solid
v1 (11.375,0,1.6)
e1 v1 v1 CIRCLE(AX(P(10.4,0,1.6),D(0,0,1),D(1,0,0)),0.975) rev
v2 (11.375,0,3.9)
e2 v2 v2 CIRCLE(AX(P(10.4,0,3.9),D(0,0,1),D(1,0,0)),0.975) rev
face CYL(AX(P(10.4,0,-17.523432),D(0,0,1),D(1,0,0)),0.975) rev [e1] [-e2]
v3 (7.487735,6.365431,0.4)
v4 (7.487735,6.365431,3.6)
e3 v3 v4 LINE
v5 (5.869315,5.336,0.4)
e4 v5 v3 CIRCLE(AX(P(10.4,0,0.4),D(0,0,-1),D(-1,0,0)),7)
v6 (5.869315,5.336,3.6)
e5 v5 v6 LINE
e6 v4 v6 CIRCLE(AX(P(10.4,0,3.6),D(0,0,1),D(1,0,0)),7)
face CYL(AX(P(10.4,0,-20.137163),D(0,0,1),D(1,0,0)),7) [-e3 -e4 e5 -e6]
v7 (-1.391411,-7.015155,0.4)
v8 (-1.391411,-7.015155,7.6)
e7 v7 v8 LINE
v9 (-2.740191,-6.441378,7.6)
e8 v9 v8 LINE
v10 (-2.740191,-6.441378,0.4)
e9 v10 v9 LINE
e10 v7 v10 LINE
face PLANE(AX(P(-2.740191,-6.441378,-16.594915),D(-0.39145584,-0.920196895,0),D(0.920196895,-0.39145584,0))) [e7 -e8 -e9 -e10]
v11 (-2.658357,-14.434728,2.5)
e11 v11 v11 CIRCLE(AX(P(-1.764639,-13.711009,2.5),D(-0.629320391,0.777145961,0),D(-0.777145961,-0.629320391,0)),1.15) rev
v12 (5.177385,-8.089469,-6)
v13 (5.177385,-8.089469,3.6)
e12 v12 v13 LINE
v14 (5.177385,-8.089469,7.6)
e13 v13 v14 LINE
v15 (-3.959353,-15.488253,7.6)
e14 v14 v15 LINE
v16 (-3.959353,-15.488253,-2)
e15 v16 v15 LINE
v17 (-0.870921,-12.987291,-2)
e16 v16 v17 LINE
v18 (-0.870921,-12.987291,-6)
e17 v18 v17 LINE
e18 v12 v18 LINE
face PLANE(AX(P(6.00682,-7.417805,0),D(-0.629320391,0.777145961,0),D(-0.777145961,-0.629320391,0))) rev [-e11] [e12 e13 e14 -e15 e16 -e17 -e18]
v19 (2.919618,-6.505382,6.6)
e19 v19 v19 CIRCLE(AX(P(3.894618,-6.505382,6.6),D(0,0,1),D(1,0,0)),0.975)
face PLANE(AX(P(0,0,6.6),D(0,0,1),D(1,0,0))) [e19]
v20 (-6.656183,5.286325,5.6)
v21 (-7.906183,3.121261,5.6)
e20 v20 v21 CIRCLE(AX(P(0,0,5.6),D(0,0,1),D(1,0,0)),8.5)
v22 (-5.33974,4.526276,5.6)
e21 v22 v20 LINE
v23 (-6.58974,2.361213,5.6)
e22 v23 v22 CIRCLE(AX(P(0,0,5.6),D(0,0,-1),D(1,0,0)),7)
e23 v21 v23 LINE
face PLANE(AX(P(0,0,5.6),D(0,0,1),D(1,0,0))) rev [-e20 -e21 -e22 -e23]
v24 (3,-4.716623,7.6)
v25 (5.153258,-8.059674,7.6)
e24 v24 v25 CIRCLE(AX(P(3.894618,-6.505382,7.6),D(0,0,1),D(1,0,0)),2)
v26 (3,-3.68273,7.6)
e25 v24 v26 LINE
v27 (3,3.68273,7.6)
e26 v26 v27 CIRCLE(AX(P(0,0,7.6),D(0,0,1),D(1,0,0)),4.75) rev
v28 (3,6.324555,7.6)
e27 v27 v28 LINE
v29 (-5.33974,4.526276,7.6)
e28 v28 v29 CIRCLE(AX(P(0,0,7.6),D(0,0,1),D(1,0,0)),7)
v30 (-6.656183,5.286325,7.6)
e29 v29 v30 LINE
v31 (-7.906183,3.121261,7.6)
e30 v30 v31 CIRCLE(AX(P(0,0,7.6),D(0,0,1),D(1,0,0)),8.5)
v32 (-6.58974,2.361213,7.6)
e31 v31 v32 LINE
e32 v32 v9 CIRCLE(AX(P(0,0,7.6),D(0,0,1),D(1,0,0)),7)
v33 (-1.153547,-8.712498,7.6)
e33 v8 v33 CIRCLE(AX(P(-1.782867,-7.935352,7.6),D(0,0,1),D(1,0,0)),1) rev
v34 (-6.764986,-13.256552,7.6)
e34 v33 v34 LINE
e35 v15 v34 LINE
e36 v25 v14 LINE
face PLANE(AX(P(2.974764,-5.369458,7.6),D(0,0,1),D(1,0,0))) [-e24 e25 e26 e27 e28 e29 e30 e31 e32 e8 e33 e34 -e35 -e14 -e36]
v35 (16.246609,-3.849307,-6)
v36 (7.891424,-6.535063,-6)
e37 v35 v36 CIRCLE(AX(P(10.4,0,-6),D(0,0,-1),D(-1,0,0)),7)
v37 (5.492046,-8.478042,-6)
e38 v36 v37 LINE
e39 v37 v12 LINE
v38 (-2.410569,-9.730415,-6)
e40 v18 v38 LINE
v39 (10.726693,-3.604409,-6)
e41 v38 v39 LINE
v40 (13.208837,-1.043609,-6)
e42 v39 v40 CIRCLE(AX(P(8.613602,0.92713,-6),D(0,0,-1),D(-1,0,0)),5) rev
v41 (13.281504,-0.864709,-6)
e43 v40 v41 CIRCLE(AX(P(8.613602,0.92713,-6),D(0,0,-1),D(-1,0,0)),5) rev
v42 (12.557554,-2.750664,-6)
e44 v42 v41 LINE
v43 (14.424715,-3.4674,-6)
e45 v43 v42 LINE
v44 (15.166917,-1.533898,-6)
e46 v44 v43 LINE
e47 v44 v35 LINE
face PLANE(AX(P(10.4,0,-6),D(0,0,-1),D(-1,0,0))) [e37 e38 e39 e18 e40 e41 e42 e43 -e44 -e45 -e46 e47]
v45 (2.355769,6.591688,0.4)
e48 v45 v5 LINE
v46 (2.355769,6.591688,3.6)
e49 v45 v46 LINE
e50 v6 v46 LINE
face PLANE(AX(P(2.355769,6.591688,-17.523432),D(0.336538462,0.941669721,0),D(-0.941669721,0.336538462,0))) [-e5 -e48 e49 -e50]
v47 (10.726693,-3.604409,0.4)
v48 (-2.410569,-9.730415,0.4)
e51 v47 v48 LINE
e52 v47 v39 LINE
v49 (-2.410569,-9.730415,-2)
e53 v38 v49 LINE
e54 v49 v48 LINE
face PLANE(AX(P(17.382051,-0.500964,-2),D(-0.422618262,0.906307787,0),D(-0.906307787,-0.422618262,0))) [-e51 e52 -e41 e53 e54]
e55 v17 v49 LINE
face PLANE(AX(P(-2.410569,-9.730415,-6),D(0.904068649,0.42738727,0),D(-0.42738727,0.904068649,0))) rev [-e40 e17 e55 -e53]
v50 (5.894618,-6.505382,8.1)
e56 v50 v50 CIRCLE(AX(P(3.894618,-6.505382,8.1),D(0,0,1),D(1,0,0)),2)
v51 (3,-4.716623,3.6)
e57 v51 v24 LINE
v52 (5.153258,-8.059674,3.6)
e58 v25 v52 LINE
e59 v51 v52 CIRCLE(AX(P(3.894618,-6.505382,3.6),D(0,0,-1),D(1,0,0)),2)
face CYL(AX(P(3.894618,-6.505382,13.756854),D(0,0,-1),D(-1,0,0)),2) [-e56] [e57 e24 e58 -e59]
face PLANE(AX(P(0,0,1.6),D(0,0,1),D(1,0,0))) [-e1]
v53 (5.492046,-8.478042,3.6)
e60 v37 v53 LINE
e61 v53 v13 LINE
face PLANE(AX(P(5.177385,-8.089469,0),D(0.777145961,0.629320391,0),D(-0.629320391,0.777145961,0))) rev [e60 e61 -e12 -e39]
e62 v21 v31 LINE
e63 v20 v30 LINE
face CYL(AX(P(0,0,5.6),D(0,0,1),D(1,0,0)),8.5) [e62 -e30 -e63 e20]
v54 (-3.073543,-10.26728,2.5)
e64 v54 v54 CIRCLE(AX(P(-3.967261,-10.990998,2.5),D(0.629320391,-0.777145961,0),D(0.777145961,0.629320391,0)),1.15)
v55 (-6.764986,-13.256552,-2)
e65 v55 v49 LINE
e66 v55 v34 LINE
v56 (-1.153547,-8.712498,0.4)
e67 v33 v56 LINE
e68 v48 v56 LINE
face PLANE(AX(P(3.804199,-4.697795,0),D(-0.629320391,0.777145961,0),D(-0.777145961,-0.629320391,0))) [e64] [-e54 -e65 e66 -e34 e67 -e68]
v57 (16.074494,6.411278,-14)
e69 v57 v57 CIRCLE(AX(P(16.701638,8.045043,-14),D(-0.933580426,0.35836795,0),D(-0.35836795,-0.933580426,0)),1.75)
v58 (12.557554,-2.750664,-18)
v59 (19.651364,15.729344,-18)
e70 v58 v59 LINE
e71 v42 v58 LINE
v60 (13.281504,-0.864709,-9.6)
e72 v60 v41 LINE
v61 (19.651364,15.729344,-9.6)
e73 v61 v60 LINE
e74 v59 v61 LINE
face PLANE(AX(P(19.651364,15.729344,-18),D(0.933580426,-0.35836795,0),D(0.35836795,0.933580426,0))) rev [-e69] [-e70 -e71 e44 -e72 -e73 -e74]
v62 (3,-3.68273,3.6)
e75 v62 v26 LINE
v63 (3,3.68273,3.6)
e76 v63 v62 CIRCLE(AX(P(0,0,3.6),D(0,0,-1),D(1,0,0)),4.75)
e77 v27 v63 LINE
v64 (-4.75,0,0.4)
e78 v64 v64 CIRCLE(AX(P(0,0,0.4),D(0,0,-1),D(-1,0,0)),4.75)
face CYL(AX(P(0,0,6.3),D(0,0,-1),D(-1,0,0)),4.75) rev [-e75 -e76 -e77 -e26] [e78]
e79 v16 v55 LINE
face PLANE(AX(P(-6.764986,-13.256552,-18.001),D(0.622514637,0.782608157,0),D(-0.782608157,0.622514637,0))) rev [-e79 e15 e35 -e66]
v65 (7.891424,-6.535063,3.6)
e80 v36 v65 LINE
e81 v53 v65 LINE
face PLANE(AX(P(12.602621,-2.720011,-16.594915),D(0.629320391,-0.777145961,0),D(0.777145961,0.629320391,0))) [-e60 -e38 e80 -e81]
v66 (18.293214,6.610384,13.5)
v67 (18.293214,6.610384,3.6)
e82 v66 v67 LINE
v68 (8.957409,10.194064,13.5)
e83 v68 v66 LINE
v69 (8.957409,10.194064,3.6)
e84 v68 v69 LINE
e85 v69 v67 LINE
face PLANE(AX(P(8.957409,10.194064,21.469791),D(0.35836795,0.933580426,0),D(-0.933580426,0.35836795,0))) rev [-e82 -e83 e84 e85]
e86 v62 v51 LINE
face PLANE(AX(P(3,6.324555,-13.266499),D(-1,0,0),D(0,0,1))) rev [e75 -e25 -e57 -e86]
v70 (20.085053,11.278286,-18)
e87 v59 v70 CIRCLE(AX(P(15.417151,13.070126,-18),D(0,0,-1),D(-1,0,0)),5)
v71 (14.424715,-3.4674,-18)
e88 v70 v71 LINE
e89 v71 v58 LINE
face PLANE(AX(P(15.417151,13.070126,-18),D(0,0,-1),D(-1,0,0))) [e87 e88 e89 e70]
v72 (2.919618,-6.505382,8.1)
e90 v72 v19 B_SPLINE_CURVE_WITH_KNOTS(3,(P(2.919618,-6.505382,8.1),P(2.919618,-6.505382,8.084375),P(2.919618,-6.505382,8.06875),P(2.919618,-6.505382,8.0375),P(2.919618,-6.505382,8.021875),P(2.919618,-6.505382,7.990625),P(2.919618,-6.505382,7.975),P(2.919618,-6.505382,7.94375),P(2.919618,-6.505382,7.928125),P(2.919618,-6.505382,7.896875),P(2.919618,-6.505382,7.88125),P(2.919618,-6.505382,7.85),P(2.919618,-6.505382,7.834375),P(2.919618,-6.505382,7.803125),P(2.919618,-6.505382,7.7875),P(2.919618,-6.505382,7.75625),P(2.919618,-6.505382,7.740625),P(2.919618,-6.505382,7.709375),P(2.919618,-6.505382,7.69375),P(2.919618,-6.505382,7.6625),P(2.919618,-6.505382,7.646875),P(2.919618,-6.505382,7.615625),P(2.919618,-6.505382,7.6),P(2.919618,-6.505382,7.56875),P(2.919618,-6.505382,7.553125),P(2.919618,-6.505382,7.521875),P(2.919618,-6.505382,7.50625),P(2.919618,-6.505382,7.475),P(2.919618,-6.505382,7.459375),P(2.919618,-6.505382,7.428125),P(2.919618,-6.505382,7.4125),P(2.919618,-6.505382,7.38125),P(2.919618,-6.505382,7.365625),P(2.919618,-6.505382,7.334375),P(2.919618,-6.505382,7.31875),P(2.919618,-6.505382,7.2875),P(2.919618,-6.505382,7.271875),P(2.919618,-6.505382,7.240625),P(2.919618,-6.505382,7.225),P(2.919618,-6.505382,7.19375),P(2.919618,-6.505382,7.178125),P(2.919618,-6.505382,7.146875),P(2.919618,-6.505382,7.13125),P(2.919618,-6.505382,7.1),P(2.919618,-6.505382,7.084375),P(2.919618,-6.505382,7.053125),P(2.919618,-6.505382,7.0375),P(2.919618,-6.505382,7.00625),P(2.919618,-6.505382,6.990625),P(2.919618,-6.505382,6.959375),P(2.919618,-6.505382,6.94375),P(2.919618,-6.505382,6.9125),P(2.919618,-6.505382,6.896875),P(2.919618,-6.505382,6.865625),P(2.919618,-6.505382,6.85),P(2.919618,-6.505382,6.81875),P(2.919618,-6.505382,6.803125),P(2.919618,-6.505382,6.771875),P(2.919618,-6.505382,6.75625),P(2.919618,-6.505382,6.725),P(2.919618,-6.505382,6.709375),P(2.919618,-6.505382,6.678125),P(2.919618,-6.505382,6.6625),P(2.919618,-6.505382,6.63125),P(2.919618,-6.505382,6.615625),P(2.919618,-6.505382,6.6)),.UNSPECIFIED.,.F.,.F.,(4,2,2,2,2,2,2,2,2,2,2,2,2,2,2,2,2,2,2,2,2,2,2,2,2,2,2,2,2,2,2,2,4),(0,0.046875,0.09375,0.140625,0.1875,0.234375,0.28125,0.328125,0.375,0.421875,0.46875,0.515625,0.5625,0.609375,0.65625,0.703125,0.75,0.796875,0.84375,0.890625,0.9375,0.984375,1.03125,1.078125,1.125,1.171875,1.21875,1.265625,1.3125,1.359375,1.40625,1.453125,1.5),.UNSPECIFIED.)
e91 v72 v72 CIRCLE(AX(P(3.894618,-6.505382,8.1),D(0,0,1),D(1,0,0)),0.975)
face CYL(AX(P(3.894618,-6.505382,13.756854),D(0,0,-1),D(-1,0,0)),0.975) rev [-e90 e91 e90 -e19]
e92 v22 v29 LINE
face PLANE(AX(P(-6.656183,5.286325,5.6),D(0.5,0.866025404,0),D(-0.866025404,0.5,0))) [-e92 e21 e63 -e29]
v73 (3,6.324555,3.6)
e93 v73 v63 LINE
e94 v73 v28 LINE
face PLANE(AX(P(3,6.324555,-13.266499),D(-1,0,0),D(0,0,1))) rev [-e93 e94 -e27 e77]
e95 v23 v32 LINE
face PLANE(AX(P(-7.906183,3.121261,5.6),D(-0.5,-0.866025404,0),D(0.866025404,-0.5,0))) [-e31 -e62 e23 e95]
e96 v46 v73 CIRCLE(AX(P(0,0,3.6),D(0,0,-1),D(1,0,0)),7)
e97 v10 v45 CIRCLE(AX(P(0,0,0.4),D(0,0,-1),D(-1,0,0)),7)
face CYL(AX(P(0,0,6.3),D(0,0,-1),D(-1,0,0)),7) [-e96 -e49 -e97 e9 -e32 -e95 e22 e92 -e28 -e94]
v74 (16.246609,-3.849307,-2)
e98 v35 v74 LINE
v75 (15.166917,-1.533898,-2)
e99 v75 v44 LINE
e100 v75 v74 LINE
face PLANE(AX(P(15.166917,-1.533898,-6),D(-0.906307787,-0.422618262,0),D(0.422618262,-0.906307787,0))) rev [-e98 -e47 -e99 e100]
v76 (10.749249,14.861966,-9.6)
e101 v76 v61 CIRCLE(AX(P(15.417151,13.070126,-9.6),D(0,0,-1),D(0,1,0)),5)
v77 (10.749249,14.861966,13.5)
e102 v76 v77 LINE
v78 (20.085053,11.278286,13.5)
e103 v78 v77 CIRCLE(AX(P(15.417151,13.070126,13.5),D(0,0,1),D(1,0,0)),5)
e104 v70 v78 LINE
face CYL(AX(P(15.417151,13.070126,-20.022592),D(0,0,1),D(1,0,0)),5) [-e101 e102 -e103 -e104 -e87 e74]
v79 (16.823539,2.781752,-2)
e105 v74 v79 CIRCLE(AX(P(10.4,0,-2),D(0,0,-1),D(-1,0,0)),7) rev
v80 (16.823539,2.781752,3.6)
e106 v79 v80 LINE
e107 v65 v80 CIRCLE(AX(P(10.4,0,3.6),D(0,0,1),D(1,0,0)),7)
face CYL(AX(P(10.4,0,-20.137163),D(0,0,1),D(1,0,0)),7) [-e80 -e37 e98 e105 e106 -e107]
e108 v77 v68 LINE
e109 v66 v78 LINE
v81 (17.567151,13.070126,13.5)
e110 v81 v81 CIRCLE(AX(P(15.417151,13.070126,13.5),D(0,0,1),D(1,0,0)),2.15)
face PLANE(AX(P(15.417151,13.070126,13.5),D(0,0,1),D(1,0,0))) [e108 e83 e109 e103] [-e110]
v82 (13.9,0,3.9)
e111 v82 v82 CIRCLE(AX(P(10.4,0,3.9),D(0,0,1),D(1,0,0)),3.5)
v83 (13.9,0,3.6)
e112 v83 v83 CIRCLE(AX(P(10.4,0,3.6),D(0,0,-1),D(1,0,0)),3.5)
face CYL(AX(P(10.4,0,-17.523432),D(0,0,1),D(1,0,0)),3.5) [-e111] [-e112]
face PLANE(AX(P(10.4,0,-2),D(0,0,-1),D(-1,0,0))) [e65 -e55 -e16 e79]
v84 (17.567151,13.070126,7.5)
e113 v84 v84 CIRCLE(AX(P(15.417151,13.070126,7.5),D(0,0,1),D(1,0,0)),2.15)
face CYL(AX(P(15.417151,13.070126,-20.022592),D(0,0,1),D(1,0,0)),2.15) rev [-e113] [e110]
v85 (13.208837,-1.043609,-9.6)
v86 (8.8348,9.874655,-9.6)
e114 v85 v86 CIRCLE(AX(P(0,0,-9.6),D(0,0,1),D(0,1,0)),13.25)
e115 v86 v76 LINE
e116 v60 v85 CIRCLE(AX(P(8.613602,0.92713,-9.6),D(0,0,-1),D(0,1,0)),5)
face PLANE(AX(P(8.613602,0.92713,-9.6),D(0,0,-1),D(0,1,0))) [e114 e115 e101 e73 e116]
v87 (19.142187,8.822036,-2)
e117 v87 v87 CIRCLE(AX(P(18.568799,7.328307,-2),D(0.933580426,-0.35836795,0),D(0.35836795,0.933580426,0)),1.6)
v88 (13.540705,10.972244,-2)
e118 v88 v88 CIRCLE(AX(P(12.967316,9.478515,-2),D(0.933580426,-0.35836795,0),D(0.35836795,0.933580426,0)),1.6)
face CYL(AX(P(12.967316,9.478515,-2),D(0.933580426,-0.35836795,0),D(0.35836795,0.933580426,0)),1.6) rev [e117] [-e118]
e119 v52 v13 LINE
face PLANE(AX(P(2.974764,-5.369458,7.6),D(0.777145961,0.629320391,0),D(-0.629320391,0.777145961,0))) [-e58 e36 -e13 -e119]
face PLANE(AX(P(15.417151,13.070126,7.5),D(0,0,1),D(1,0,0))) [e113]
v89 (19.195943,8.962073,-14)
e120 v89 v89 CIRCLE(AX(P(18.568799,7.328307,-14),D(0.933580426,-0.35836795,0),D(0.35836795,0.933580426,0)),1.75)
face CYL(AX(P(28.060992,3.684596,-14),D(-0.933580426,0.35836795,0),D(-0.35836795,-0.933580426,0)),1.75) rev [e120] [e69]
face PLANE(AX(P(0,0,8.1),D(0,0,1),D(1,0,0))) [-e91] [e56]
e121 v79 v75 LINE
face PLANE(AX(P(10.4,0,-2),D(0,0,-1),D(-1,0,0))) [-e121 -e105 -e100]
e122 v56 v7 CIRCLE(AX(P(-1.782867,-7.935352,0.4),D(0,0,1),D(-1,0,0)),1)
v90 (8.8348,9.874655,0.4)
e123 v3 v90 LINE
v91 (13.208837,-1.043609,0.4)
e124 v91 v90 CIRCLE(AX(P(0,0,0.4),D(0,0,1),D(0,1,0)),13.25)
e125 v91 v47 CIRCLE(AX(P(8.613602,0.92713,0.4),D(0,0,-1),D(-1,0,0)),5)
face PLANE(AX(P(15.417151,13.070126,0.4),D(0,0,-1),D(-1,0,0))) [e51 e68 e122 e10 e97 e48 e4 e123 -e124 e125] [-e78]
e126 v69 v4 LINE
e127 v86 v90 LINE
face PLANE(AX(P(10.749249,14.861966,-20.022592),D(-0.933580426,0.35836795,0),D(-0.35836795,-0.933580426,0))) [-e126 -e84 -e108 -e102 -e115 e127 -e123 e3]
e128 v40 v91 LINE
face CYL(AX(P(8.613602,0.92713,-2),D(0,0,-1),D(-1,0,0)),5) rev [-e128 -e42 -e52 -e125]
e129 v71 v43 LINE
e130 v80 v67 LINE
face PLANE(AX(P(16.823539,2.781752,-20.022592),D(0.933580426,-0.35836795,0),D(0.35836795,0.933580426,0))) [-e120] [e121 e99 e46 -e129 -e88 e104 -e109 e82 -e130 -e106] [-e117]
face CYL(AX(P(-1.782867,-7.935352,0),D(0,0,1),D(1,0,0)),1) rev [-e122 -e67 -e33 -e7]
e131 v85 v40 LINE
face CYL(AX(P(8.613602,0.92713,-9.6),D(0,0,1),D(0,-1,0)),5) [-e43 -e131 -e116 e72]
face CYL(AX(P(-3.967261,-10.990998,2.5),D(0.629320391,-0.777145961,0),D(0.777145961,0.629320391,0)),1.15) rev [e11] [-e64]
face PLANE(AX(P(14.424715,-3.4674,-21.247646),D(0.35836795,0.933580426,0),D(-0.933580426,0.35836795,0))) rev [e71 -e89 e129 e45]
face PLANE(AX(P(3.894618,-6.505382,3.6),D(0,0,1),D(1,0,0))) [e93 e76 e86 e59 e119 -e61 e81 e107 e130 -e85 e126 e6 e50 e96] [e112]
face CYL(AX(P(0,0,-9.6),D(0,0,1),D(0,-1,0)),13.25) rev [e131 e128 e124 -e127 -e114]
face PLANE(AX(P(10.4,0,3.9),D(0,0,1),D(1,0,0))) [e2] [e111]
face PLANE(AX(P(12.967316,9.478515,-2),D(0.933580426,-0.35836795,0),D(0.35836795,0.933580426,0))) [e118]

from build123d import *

# Parameters (mm, degrees)
SKETCH_1_R                  = 7
SKETCH_1_R_2                = 4.75
EXTRUDE_1_DEPTH             = 6.3
SKETCH_2_R                  = 7
SKETCH_2_R_2                = 2
EXTRUDE_2_DEPTH             = 1.8
CUT_EXTRUDE_START           = -4
CUT_EXTRUDE_1_DEPTH         = 4
EXTRUDE_START               = -4.1
SKETCH_4_R                  = 0.975
EXTRUDE_3_DEPTH             = 4.1
EXTRUDE_4_REACH             = 18.094
SKETCH_5_R                  = 2
SKETCH_5_R_2                = 0.975
EXTRUDE_4_DIRECTION_2_REACH = 18.094
SKETCH_6_R                  = 0.975
EXTRUDE_5_DEPTH             = 6.6
SKETCH_7_R                  = 0.975
EXTRUDE_6_DEPTH             = 1.6
EXTRUDE_7_DEPTH             = 4.1
EXTRUDE_START_2             = 2
EXTRUDE_8_DEPTH             = 2
CUT_EXTRUDE_2_DEPTH         = 19.287742604
EXTRUDE_9_DEPTH             = 4.1
EXTRUDE_10_DEPTH            = 1
EXTRUDE_10_DEPTH_BACK       = 4
SKETCH_12_W                 = 12.932716562
SKETCH_12_H                 = 7.6
SKETCH_12_R                 = 1.15
CUT_EXTRUDE_START_2         = -1.5
SKETCH_13_R                 = 0.975
CUT_EXTRUDE_3_DEPTH         = 1.5
EXTRUDE_12_DEPTH            = 3.5
FILLET_2_R                  = 1
CUT_EXTRUDE_START_3         = -0.5
CUT_EXTRUDE_4_DEPTH         = 0.5
CUT_EXTRUDE_5_DEPTH         = 0.5
EXTRUDE_START_3             = -5.6
EXTRUDE_14_DEPTH            = 5.6
CUT_EXTRUDE_6_DEPTH         = 26.902153922
EXTRUDE_START_4             = -3.6
SKETCH_21_R                 = 2.15
EXTRUDE_15_DEPTH            = 3.6
SKETCH_22_R                 = 5
SKETCH_22_R_2               = 2.15
EXTRUDE_16_DEPTH            = 9.9
EXTRUDE_19_DEPTH            = 2
CUT_EXTRUDE_8_DEPTH         = 31.424324472
CUT_EXTRUDE_9_DEPTH         = 1.5
EXTRUDE_21_DEPTH            = 2
EXTRUDE_22_DEPTH            = 2
EXTRUDE_START_5             = -2
EXTRUDE_23_DEPTH            = 2
EXTRUDE_START_6             = 18
EXTRUDE_24_DEPTH            = 18
SKETCH_37_R                 = 1.75
CUT_EXTRUDE_10_DEPTH        = 36.025431655
CUT_EXTRUDE_11_DEPTH        = 33.670927742
EXTRUDE_26_DEPTH            = 10
EXTRUDE_26_DEPTH_BACK       = 2
CUT_EXTRUDE_12_DEPTH        = 10
EXTRUDE_START_7             = 4
EXTRUDE_27_DEPTH            = 4
CUT_EXTRUDE_START_4         = -0.2
SKETCH_44_R                 = 3.5
CUT_EXTRUDE_13_DEPTH        = 0.2
FILLET_3_R                  = 5
CUT_EXTRUDE_14_DEPTH        = 0.4
EXTRUDE_START_8             = 10
EXTRUDE_28_DEPTH            = 10
EXTRUDE_29_DEPTH            = 6
EXTRUDE_30_DEPTH            = 12
SKETCH_49_R                 = 1.6
CUT_EXTRUDE_15_DEPTH        = 6
SKETCH_50_R                 = 2.15
EXTRUDE_31_DEPTH            = 7.1
EXTRUDE_32_DEPTH            = 9.9
EXTRUDE_33_DEPTH            = 9.9
CUT_EXTRUDE_16_REACH        = 39.4


# Read off the part's stored shape, not the designer's step: 凸台-拉伸14
with BuildPart() as part:
    # 草图1 → 凸台-拉伸1 (new body)
    with BuildSketch(Plane.XY):
        Circle(SKETCH_1_R)
        Circle(SKETCH_1_R_2, mode=Mode.SUBTRACT)
    extrude(amount=EXTRUDE_1_DEPTH)

    # 草图2 → 凸台-拉伸2 (add)
    with BuildSketch(Plane.XY.offset(6.3)):
        Circle(SKETCH_2_R)
        Circle(SKETCH_2_R_2, mode=Mode.SUBTRACT)
    extrude(amount=EXTRUDE_2_DEPTH)

    # 草图3 → 切除-拉伸1 (cut)
    with BuildSketch(Plane.XY.offset(8.1).offset(CUT_EXTRUDE_START)):
        with BuildLine():
            Line((3, 6.32455532), (3, -6.32455532))
            ThreePointArc((3, -6.32455532), (7, 0), (3, 6.32455532))
        make_face()
    extrude(amount=CUT_EXTRUDE_1_DEPTH, mode=Mode.SUBTRACT)

    # 草图4 → 凸台-拉伸3 (add)
    with BuildSketch(Plane.XY.offset(4.1).offset(EXTRUDE_START)):
        with BuildLine():
            Line((2.355769231, 6.591688049), (11.577884615, 3.295844024))
            ThreePointArc((11.577884615, 3.295844024), (13.9, 0), (11.577884615, -3.295844024))
            Line((11.577884615, -3.295844024), (2.355769231, -6.591688049))
            ThreePointArc((2.355769231, -6.591688049), (2.681213529, -6.46614986), (3, -6.32455532))
            ThreePointArc((3, -6.32455532), (7, 0), (3, 6.32455532))
            ThreePointArc((3, 6.32455532), (2.681213529, 6.46614986), (2.355769231, 6.591688049))
        make_face()
        with Locations((10.4, 0)):
            Circle(SKETCH_4_R, mode=Mode.SUBTRACT)
    extrude(amount=EXTRUDE_3_DEPTH)

    # 凸台-拉伸4: up to this face of the body (flat: up to its plane)
    extrude_4_end = Plane(part.part.faces().sort_by_distance((2.827953495, 0, 8.1))[0])
    # 草图5 → 凸台-拉伸4 (add, up to the picked face)
    with BuildSketch(Plane.XY.offset(4.1), mode=Mode.PRIVATE) as extrude_4_sk1:
        with Locations((3.894617613, -6.505382387)):
            Circle(SKETCH_5_R)
        with Locations((3.894617613, -6.505382387)):
            Circle(SKETCH_5_R_2, mode=Mode.SUBTRACT)
    extrude_4_tool1 = split(extrude(extrude_4_sk1.sketch, amount=EXTRUDE_4_REACH, mode=Mode.PRIVATE), bisect_by=extrude_4_end, keep=Keep.BOTH, mode=Mode.PRIVATE)
    add(extrude_4_tool1.solids().sort_by(Axis((1.951186, -6.505382, 4.1), (0, 0, 1)))[0])

    # 凸台-拉伸4 direction 2: up to this face of the body (flat: up to its plane)
    extrude_4_direction_2_end = Plane(part.part.faces().sort_by_distance((-6.748442849, 0, 0))[0])
    # 草图5 → 凸台-拉伸4 direction 2 (add, up to the picked face)
    with BuildSketch(Plane.XY.offset(4.1), mode=Mode.PRIVATE) as extrude_4_direction_2_sk1:
        with Locations((3.894617613, -6.505382387)):
            Circle(SKETCH_5_R)
        with Locations((3.894617613, -6.505382387)):
            Circle(SKETCH_5_R_2, mode=Mode.SUBTRACT)
    extrude_4_direction_2_tool1 = split(extrude(extrude_4_direction_2_sk1.sketch, amount=-EXTRUDE_4_DIRECTION_2_REACH, mode=Mode.PRIVATE), bisect_by=extrude_4_direction_2_end, keep=Keep.BOTH, mode=Mode.PRIVATE)
    add(extrude_4_direction_2_tool1.solids().sort_by(Axis((1.951186, -6.505382, 4.1), (0, 0, -1)))[0])

    # 草图6 → 凸台-拉伸5 (add)
    with BuildSketch(Plane(origin=(0, 0, 0), x_dir=(-1, 0, 0), z_dir=(0, 0, -1))):
        with Locations((-3.894617613, -6.505382387)):
            Circle(SKETCH_6_R)
    extrude(amount=-EXTRUDE_5_DEPTH)

    # 草图7 → 凸台-拉伸6 (add)
    with BuildSketch(Plane(origin=(0, 0, 0), x_dir=(-1, 0, 0), z_dir=(0, 0, -1))):
        with Locations(Location((-10.4, 0, 0), (0, 0, 180))):
            Circle(SKETCH_7_R)
    extrude(amount=-EXTRUDE_6_DEPTH)

    # 草图8 → 凸台-拉伸7 (add)
    with BuildSketch(Plane(origin=(0, 0, 0), x_dir=(-1, 0, 0), z_dir=(0, 0, -1))):
        with BuildLine():
            ThreePointArc((-11.577884615, -3.295844024), (-12.023769403, -3.100543972), (-12.438245142, -2.845269186))
            Line((-12.438245142, -2.845269186), (-5.059329123, -8.131250493))
            ThreePointArc((-5.059329123, -8.131250493), (-5.857511533, -6.888850066), (-5.585595832, -5.437397058))
            Line((-5.585595832, -5.437397058), (-11.577884615, -3.295844024))
        make_face()
        with BuildLine():
            ThreePointArc((-1.907841671, -6.734993701), (-2.348687888, -7.774280052), (-3.282091086, -8.409276096))
            Line((-3.282091086, -8.409276096), (2.143842843, -6.663627981))
            ThreePointArc((2.143842843, -6.663627981), (0.123277755, -6.998914387), (-1.907841671, -6.734993701))
        make_face()
    extrude(amount=-EXTRUDE_7_DEPTH)

    # 草图9 → 凸台-拉伸8 (add)
    with BuildSketch(Plane(origin=(0, 0, 0), x_dir=(-1, 0, 0), z_dir=(0, 0, -1)).offset(EXTRUDE_START_2)):
        with BuildLine():
            Line((-13.893898751, 0.206570848), (-2.122150074, -8.036096313))
            Line((-2.122150074, -8.036096313), (-3.282091086, -8.409276096))
            ThreePointArc((-3.282091086, -8.409276096), (-4.203731868, -8.481350093), (-5.059329123, -8.131250493))
            Line((-5.059329123, -8.131250493), (-12.438245142, -2.845269186))
            ThreePointArc((-12.438245142, -2.845269186), (-13.559048261, -1.50678933), (-13.893898751, 0.206570848))
        make_face()
    extrude(amount=-EXTRUDE_8_DEPTH)

    # 草图10 → 切除-拉伸2 (cut, through all)
    with BuildSketch(Plane(origin=(0, 0, 6.3), x_dir=(-1, 0, 0), z_dir=(0, 0, -1))):
        with BuildLine():
            Line((-3, 3.682729966), (-3, -3.682729966))
            ThreePointArc((-3, -3.682729966), (4.75, 0), (-3, 3.682729966))
        make_face()
    extrude(amount=-CUT_EXTRUDE_2_DEPTH, mode=Mode.SUBTRACT)

    # 草图11 → 凸台-拉伸9 (add)
    with BuildSketch(Plane.XY.offset(4.1).offset(EXTRUDE_START)):
        with BuildLine():
            Line((12.602621369, -2.720010865), (5.492045563, -8.47804162))
            ThreePointArc((5.492045563, -8.47804162), (4.24689632, -9.019156485), (2.900970325, -8.841153259))
            Line((2.900970325, -8.841153259), (-2.740190881, -6.441378264))
            ThreePointArc((-2.740190881, -6.441378264), (-2.444543943, -6.559283872), (-2.143842843, -6.663627981))
            Line((-2.143842843, -6.663627981), (3.282091086, -8.409276096))
            ThreePointArc((3.282091086, -8.409276096), (4.203731868, -8.481350093), (5.059329123, -8.131250493))
            Line((5.059329123, -8.131250493), (12.438245142, -2.845269186))
            ThreePointArc((12.438245142, -2.845269186), (12.521357962, -2.783853516), (12.602621369, -2.720010865))
        make_face()
    extrude(amount=EXTRUDE_9_DEPTH)

    # 草图12 → 凸台-拉伸10 (add, two sides: drawn at the far end of the back side and taken through both)
    with BuildSketch(Plane(origin=(6.321480576, -7.806378389, 0), x_dir=(0.7771459614569697, 0.629320391049839, 0), z_dir=(0.629320391049839, -0.7771459614569697, 0)).offset(-EXTRUDE_10_DEPTH_BACK)):
        with Locations((-7.533641719, 3.8)):
            Rectangle(SKETCH_12_W, SKETCH_12_H)
        with Locations((-10, 2.5)):
            Circle(SKETCH_12_R, mode=Mode.SUBTRACT)
    extrude(amount=EXTRUDE_10_DEPTH + EXTRUDE_10_DEPTH_BACK)

    # 草图13 → 切除-拉伸3 (cut)
    with BuildSketch(Plane.XY.offset(8.1).offset(CUT_EXTRUDE_START_2)):
        with Locations(Location((3.894617613, -6.505382387, 0), (0, 0, 180))):
            Circle(SKETCH_13_R)
    extrude(amount=CUT_EXTRUDE_3_DEPTH, mode=Mode.SUBTRACT)

    # 草图15 → 凸台-拉伸12 (add)
    with BuildSketch(Plane.XY.offset(4.1)):
        with BuildLine():
            Line((-2.740190881, -6.441378264), (0.138688588, -7.666066358))
            Line((0.138688588, -7.666066358), (1.061105347, -6.919107995))
            ThreePointArc((1.061105347, -6.919107995), (-0.872862235, -6.94536619), (-2.740190881, -6.441378264))
        make_face()
    extrude(amount=EXTRUDE_12_DEPTH)

    # 圆角2
    fillet_2_edges = [part.edges().sort_by_distance(p)[0] for p in [
        (0.138688588, -7.666066358, 3.8),
    ]]
    fillet(fillet_2_edges, radius=FILLET_2_R)

    # 草图17 → 切除-拉伸4 (cut)
    with BuildSketch(Plane.XY.offset(8.1).offset(CUT_EXTRUDE_START_3)):
        with BuildLine():
            ThreePointArc((3, -4.716623229), (2.135623001, -5.553574658), (1.907841671, -6.734993701))
            ThreePointArc((1.907841671, -6.734993701), (-6.975649262, 0.583367269), (3, 6.32455532))
            Line((3, 6.32455532), (3, 3.682729966))
            ThreePointArc((3, 3.682729966), (-4.75, 0), (3, -3.682729966))
            Line((3, -3.682729966), (3, -4.716623229))
        make_face()
    extrude(amount=CUT_EXTRUDE_4_DEPTH, mode=Mode.SUBTRACT)

    # 草图18 → 切除-拉伸5 (cut)
    with BuildSketch(Plane.XY.offset(4.1).offset(CUT_EXTRUDE_START_3)):
        with BuildLine():
            Line((5.153258395, -8.05967431), (5.492045563, -8.47804162))
            Line((5.492045563, -8.47804162), (12.602621369, -2.720010865))
            ThreePointArc((12.602621369, -2.720010865), (6.949698174, -0.587722137), (11.577884615, 3.295844024))
            Line((11.577884615, 3.295844024), (2.355769231, 6.591688049))
            ThreePointArc((2.355769231, 6.591688049), (2.681213529, 6.46614986), (3, 6.32455532))
            Line((3, 6.32455532), (3, 3.682729966))
            ThreePointArc((3, 3.682729966), (4.75, 0), (3, -3.682729966))
            Line((3, -3.682729966), (3, -4.716623229))
            ThreePointArc((3, -4.716623229), (5.576023528, -5.422389243), (5.153258395, -8.05967431))
        make_face()
    extrude(amount=CUT_EXTRUDE_5_DEPTH, mode=Mode.SUBTRACT)

    # 凸台-拉伸14 outline → 凸台-拉伸14 (add)
    with BuildSketch(Plane.XY.offset(3.6).offset(EXTRUDE_START_3)):
        with BuildLine():
            ThreePointArc((7.891424353, -6.535062985), (17.300603652, 1.175444274), (5.869315311, 5.336000024))
            Line((5.869315311, 5.336000024), (11.577884615, 3.295844024))
            ThreePointArc((11.577884615, 3.295844024), (13.200409282, 2.09945418), (13.893898751, 0.206570848))
            ThreePointArc((13.893898751, 0.206570848), (13.602156383, -1.412867474), (12.602621369, -2.720010865))
            Line((12.602621369, -2.720010865), (7.891424353, -6.535062985))
        make_face()
    extrude(amount=EXTRUDE_14_DEPTH)

    # 草图20 → 切除-拉伸6 (cut, through all)
    with BuildSketch(Plane(origin=(0, 0, 0), x_dir=(-1, 0, 0), z_dir=(0, 0, -1))):
        with BuildLine():
            Line((-13.893898751, 0.206570848), (-16.985983121, 2.371671633))
            ThreePointArc((-16.985983121, 2.371671633), (-12.203572459, 6.763662202), (-5.869315311, 5.336000024))
            Line((-5.869315311, 5.336000024), (-11.577884615, 3.295844024))
            ThreePointArc((-11.577884615, 3.295844024), (-13.200409282, 2.09945418), (-13.893898751, 0.206570848))
        make_face()
    extrude(amount=CUT_EXTRUDE_6_DEPTH, mode=Mode.SUBTRACT)

    # 草图21 → 凸台-拉伸15 (add)
    with BuildSketch(Plane.XY.offset(3.6).offset(EXTRUDE_START_4)):
        with BuildLine():
            Line((10.749249161, 14.861965719), (7.487735101, 6.365431105))
            ThreePointArc((7.487735101, 6.365431105), (12.908575647, 6.535062985), (16.823539366, 2.78175161))
            Line((16.823539366, 2.78175161), (20.085053426, 11.278286223))
            ThreePointArc((20.085053426, 11.278286223), (17.208991041, 17.738028103), (10.749249161, 14.861965719))
        make_face()
        with Locations((15.417151294, 13.070125971)):
            Circle(SKETCH_21_R, mode=Mode.SUBTRACT)
    extrude(amount=EXTRUDE_15_DEPTH)

    # 草图22 → 凸台-拉伸16 (add)
    with BuildSketch(Plane.XY.offset(3.6)):
        with Locations((15.417151294, 13.070125971)):
            Circle(SKETCH_22_R)
        with Locations((15.417151294, 13.070125971)):
            Circle(SKETCH_22_R_2, mode=Mode.SUBTRACT)
    extrude(amount=EXTRUDE_16_DEPTH)

    # 草图26 → 凸台-拉伸19 (add)
    with BuildSketch(Plane(origin=(0, 0, 0), x_dir=(-1, 0, 0), z_dir=(0, 0, -1)).offset(EXTRUDE_START_2)):
        with BuildLine():
            Line((3.929242493, -17.394009825), (-9.064960772, -6.871511497))
            ThreePointArc((-9.064960772, -6.871511497), (-8.470843908, -6.728919436), (-7.891424353, -6.535062985))
            Line((-7.891424353, -6.535062985), (-12.602621369, -2.720010865))
            ThreePointArc((-12.602621369, -2.720010865), (-12.521357962, -2.783853516), (-12.438245142, -2.845269186))
            Line((-12.438245142, -2.845269186), (-5.059329123, -8.131250493))
            ThreePointArc((-5.059329123, -8.131250493), (-4.203731868, -8.481350093), (-3.282091086, -8.409276096))
            Line((-3.282091086, -8.409276096), (-0.375625113, -7.474198943))
            Line((-0.375625113, -7.474198943), (7.075844448, -13.508280018))
            Line((7.075844448, -13.508280018), (3.929242493, -17.394009825))
        make_face()
    extrude(amount=-EXTRUDE_19_DEPTH)

    # 草图29 → 切除-拉伸8 (cut, through all)
    with BuildSketch(Plane(origin=(0, 0, 0), x_dir=(-1, 0, 0), z_dir=(0, 0, -1))):
        with BuildLine():
            Line((-17.382050899, -0.500964319), (-3.914897366, -6.780801145))
            Line((-3.914897366, -6.780801145), (-16.985983121, 2.371671633))
            ThreePointArc((-16.985983121, 2.371671633), (-17.334399478, 0.956087801), (-17.382050899, -0.500964319))
        make_face()
    extrude(amount=CUT_EXTRUDE_8_DEPTH, mode=Mode.SUBTRACT)

    # 草图32 → 切除-拉伸9 (cut)
    with BuildSketch(Plane(origin=(6.950800967, -8.58352435, 0), x_dir=(0.7771459614569697, 0.6293203910498391, 0), z_dir=(0.6293203910498391, -0.7771459614569698, 0))):
        Polygon((-1.067283438, 0), (-1.067283438, 7.6), (-14, 7.6), (-14, -2), (2.720415352, -2), (2.720415352, 0), align=None)
    extrude(amount=-CUT_EXTRUDE_9_DEPTH, mode=Mode.SUBTRACT)

    # 草图30 → 凸台-拉伸21 (add)
    with BuildSketch(Plane(origin=(0, 0, -2), x_dir=(-1, 0, 0), z_dir=(0, 0, -1))):
        Polygon((-3.914897366, -6.780801145), (-1.590034558, -7.864902477), (-2.122150074, -8.036096313), align=None)
    extrude(amount=-EXTRUDE_21_DEPTH)

    # 草图33 → 凸台-拉伸22 (add)
    with BuildSketch(Plane(origin=(0, 0, 0), x_dir=(-1, 0, 0), z_dir=(0, 0, -1)).offset(EXTRUDE_START_2)):
        with BuildLine():
            Line((-7.891424353, -6.535062985), (-5.492045563, -8.47804162))
            Line((-5.492045563, -8.47804162), (-5.177385367, -8.089468639))
            Line((-5.177385367, -8.089468639), (-8.120980185, -5.705792555))
            Line((-8.120980185, -5.705792555), (-9.064960772, -6.871511497))
            ThreePointArc((-9.064960772, -6.871511497), (-8.470843908, -6.728919436), (-7.891424353, -6.535062985))
        make_face()
    extrude(amount=-EXTRUDE_22_DEPTH)

    # 草图34 → 凸台-拉伸23 (add)
    with BuildSketch(Plane.XY.offset(7.6).offset(EXTRUDE_START_5)):
        with BuildLine():
            Line((-6.65618294, 5.286324685), (-5.339740145, 4.526276083))
            ThreePointArc((-5.339740145, 4.526276083), (-6.062177826, 3.5), (-6.589740145, 2.361212574))
            Line((-6.589740145, 2.361212574), (-7.90618294, 3.121261175))
            ThreePointArc((-7.90618294, 3.121261175), (-7.361215932, 4.25), (-6.65618294, 5.286324685))
        make_face()
    extrude(amount=EXTRUDE_23_DEPTH)

    # 草图36 → 凸台-拉伸24 (add)
    with BuildSketch(Plane(origin=(0, 0, 0), x_dir=(-1, 0, 0), z_dir=(0, 0, -1)).offset(EXTRUDE_START_6)):
        with BuildLine():
            Line((-19.651364371, 15.729343828), (-15.350948977, 4.52637871))
            Line((-15.350948977, 4.52637871), (-17.21810983, 3.809642811))
            Line((-17.21810983, 3.809642811), (-20.085053426, 11.278286223))
            ThreePointArc((-20.085053426, 11.278286223), (-20.393584982, 13.555005075), (-19.651364371, 15.729343828))
        make_face()
    extrude(amount=-EXTRUDE_24_DEPTH)

    # 草图37 → 切除-拉伸10 (cut, through all)
    with BuildSketch(Plane(origin=(11.865094372, -4.554583002, 0), x_dir=(0.35836794954529744, 0.933580426497203, 0), z_dir=(-0.933580426497203, 0.35836794954529744, 0))):
        with Locations(Location((13.496026675, 14, 0), (0, 0, 180))):
            Circle(SKETCH_37_R)
    extrude(amount=-CUT_EXTRUDE_10_DEPTH, mode=Mode.SUBTRACT)

    # 草图39 → 切除-拉伸11 (cut, through all)
    with BuildSketch(Plane(origin=(0, 0, 0), x_dir=(-1, 0, 0), z_dir=(0, 0, -1))):
        Polygon((-1.590034558, -7.864902477), (2.410569302, -9.730414694), (-0.375625113, -7.474198943), align=None)
    extrude(amount=CUT_EXTRUDE_11_DEPTH, mode=Mode.SUBTRACT)

    # 草图40 → 凸台-拉伸26 (add, two sides: drawn at the far end of the back side and taken through both)
    with BuildSketch(Plane(origin=(0, 0, -2), x_dir=(-1, 0, 0), z_dir=(0, 0, -1)).offset(-EXTRUDE_26_DEPTH_BACK)):
        with BuildLine():
            Line((-17.382050899, -0.500964319), (-12.557553919, -2.750664208))
            Line((-12.557553919, -2.750664208), (-15.350948977, 4.52637871))
            Line((-15.350948977, 4.52637871), (-17.21810983, 3.809642811))
            Line((-17.21810983, 3.809642811), (-16.823539366, 2.78175161))
            ThreePointArc((-16.823539366, 2.78175161), (-17.300834627, 1.174087496), (-17.382050899, -0.500964319))
        make_face()
    extrude(amount=EXTRUDE_26_DEPTH + EXTRUDE_26_DEPTH_BACK)

    # 草图42 → 切除-拉伸12 (cut)
    with BuildSketch(Plane(origin=(0, 0, -12), x_dir=(-1, 0, 0), z_dir=(0, 0, -1))):
        with BuildLine():
            Line((-16.823539366, 2.78175161), (-15.166916523, -1.533898443))
            Line((-15.166916523, -1.533898443), (-17.382050899, -0.500964319))
            ThreePointArc((-17.382050899, -0.500964319), (-17.300834627, 1.174087496), (-16.823539366, 2.78175161))
        make_face()
    extrude(amount=-CUT_EXTRUDE_12_DEPTH, mode=Mode.SUBTRACT)

    # 草图43 → 凸台-拉伸27 (add)
    with BuildSketch(Plane(origin=(0, 0, -2), x_dir=(-1, 0, 0), z_dir=(0, 0, -1)).offset(EXTRUDE_START_7)):
        with BuildLine():
            Line((-15.166916523, -1.533898443), (2.410569302, -9.730414694))
            Line((2.410569302, -9.730414694), (0.870921378, -12.987290869))
            Line((0.870921378, -12.987290869), (-5.177385367, -8.089468639))
            Line((-5.177385367, -8.089468639), (-5.492045563, -8.47804162))
            Line((-5.492045563, -8.47804162), (-7.891424353, -6.535062985))
            ThreePointArc((-7.891424353, -6.535062985), (-12.542180804, -6.664162468), (-16.246609113, -3.849306675))
            Line((-16.246609113, -3.849306675), (-15.166916523, -1.533898443))
        make_face()
    extrude(amount=-EXTRUDE_27_DEPTH)

    # 草图44 → 切除-拉伸13 (cut)
    with BuildSketch(Plane.XY.offset(4.1).offset(CUT_EXTRUDE_START_4)):
        with Locations((10.4, 0)):
            Circle(SKETCH_44_R)
    extrude(amount=CUT_EXTRUDE_13_DEPTH, mode=Mode.SUBTRACT)

    # 圆角3
    fillet_3_edges = [part.edges().sort_by_distance(p)[0] for p in [
        (12.557553919, -2.750664208, -3),
    ]]
    fillet(fillet_3_edges, radius=FILLET_3_R)

    # 草图45 → 切除-拉伸14 (cut)
    with BuildSketch(Plane(origin=(0, 0, 0), x_dir=(-1, 0, 0), z_dir=(0, 0, -1))):
        with BuildLine():
            Line((-19.651364371, 15.729343828), (-13.28150417, -0.864709327))
            ThreePointArc((-13.28150417, -0.864709327), (-12.270370545, -2.482861379), (-10.726693346, -3.604408514))
            Line((-10.726693346, -3.604408514), (2.410569302, -9.730414694))
            Line((2.410569302, -9.730414694), (1.153546777, -8.712497924))
            ThreePointArc((1.153546777, -8.712497924), (0.792544381, -7.796568755), (1.391411328, -7.015155068))
            Line((1.391411328, -7.015155068), (2.740190881, -6.441378264))
            ThreePointArc((2.740190881, -6.441378264), (6.519367253, 2.549088195), (-2.355769231, 6.591688049))
            Line((-2.355769231, 6.591688049), (-5.869315311, 5.336000024))
            ThreePointArc((-5.869315311, 5.336000024), (-6.643098786, 5.906411201), (-7.487735101, 6.365431105))
            Line((-7.487735101, 6.365431105), (-10.749249161, 14.861965719))
            ThreePointArc((-10.749249161, 14.861965719), (-14.93227219, 18.046559659), (-19.651364371, 15.729343828))
        make_face()
    extrude(amount=-CUT_EXTRUDE_14_DEPTH, mode=Mode.SUBTRACT)

    # 草图46 → 凸台-拉伸28 (add)
    with BuildSketch(Plane(origin=(0, 0, 0.4), x_dir=(-1, 0, 0), z_dir=(0, 0, -1)).offset(EXTRUDE_START_8)):
        with BuildLine():
            Line((-19.651364371, 15.729343828), (-13.28150417, -0.864709327))
            ThreePointArc((-13.28150417, -0.864709327), (-13.246034382, -0.954509971), (-13.208837205, -1.04360897))
            ThreePointArc((-13.208837205, -1.04360897), (-12.299699436, 4.927463221), (-8.834799924, 9.874654946))
            Line((-8.834799924, 9.874654946), (-10.749249161, 14.861965719))
            ThreePointArc((-10.749249161, 14.861965719), (-14.93227219, 18.046559659), (-19.651364371, 15.729343828))
        make_face()
    extrude(amount=-EXTRUDE_28_DEPTH)

    # 草图47 → 凸台-拉伸29 (add)
    with BuildSketch(Plane(origin=(0, 0, -12), x_dir=(-1, 0, 0), z_dir=(0, 0, -1))):
        Polygon((-17.21810983, 3.809642811), (-15.166916523, -1.533898443), (-12.557553919, -2.750664208), (-15.350948977, 4.52637871), align=None)
    extrude(amount=EXTRUDE_29_DEPTH)

    # 草图48 → 凸台-拉伸30 (add)
    with BuildSketch(Plane(origin=(0, 0, -6), x_dir=(-1, 0, 0), z_dir=(0, 0, -1))):
        Polygon((-15.166916523, -1.533898443), (-14.424714772, -3.467400107), (-12.557553919, -2.750664208), align=None)
    extrude(amount=EXTRUDE_30_DEPTH)

    # 草图49 → 切除-拉伸15 (cut)
    with BuildSketch(Plane(origin=(13.732255225, -5.271318901, 0), x_dir=(0, 0, -1), z_dir=(0.9335804264972031, -0.3583679495452971, 0))):
        with Locations(Location((2, 13.496026675, 0), (0, 0, 90))):
            Circle(SKETCH_49_R)
    extrude(amount=-CUT_EXTRUDE_15_DEPTH, mode=Mode.SUBTRACT)

    # 草图50 → 凸台-拉伸31 (add)
    with BuildSketch(Plane.XY.offset(0.4)):
        with Locations((15.417151294, 13.070125971)):
            Circle(SKETCH_50_R)
    extrude(amount=EXTRUDE_31_DEPTH)

    # 草图51 → 凸台-拉伸32 (add)
    with BuildSketch(Plane.XY.offset(3.6)):
        with BuildLine():
            Line((10.749249161, 14.861965719), (8.957409413, 10.194063586))
            Line((8.957409413, 10.194063586), (13.625311546, 8.402223838))
            ThreePointArc((13.625311546, 8.402223838), (10.849424005, 11.036442756), (10.749249161, 14.861965719))
        make_face()
    extrude(amount=EXTRUDE_32_DEPTH)

    # 草图52 → 凸台-拉伸33 (add)
    with BuildSketch(Plane.XY.offset(3.6)):
        with BuildLine():
            Line((20.085053426, 11.278286223), (18.293213678, 6.610384091))
            Line((18.293213678, 6.610384091), (13.625311546, 8.402223838))
            ThreePointArc((13.625311546, 8.402223838), (17.450834509, 8.502398683), (20.085053426, 11.278286223))
        make_face()
    extrude(amount=EXTRUDE_33_DEPTH)

    # 草图53 → 切除-拉伸16 (cut, up to next)
    with BuildSketch(Plane.XY.offset(7.6), mode=Mode.PRIVATE) as cut_extrude_16_sk1:
        Polygon((-7.075844448, -13.508280018), (-6.764986064, -13.256551861), (-3.959352804, -15.488253325), (-4.87322308, -16.228290883), align=None)
    cut_extrude_16_tool1 = extrude(cut_extrude_16_sk1.sketch, amount=-CUT_EXTRUDE_16_REACH, mode=Mode.PRIVATE) & part.part
    add(cut_extrude_16_tool1.solids().sort_by_distance((-5.462861, -14.823514, 7.6))[0], mode=Mode.SUBTRACT)


solid = part.part
